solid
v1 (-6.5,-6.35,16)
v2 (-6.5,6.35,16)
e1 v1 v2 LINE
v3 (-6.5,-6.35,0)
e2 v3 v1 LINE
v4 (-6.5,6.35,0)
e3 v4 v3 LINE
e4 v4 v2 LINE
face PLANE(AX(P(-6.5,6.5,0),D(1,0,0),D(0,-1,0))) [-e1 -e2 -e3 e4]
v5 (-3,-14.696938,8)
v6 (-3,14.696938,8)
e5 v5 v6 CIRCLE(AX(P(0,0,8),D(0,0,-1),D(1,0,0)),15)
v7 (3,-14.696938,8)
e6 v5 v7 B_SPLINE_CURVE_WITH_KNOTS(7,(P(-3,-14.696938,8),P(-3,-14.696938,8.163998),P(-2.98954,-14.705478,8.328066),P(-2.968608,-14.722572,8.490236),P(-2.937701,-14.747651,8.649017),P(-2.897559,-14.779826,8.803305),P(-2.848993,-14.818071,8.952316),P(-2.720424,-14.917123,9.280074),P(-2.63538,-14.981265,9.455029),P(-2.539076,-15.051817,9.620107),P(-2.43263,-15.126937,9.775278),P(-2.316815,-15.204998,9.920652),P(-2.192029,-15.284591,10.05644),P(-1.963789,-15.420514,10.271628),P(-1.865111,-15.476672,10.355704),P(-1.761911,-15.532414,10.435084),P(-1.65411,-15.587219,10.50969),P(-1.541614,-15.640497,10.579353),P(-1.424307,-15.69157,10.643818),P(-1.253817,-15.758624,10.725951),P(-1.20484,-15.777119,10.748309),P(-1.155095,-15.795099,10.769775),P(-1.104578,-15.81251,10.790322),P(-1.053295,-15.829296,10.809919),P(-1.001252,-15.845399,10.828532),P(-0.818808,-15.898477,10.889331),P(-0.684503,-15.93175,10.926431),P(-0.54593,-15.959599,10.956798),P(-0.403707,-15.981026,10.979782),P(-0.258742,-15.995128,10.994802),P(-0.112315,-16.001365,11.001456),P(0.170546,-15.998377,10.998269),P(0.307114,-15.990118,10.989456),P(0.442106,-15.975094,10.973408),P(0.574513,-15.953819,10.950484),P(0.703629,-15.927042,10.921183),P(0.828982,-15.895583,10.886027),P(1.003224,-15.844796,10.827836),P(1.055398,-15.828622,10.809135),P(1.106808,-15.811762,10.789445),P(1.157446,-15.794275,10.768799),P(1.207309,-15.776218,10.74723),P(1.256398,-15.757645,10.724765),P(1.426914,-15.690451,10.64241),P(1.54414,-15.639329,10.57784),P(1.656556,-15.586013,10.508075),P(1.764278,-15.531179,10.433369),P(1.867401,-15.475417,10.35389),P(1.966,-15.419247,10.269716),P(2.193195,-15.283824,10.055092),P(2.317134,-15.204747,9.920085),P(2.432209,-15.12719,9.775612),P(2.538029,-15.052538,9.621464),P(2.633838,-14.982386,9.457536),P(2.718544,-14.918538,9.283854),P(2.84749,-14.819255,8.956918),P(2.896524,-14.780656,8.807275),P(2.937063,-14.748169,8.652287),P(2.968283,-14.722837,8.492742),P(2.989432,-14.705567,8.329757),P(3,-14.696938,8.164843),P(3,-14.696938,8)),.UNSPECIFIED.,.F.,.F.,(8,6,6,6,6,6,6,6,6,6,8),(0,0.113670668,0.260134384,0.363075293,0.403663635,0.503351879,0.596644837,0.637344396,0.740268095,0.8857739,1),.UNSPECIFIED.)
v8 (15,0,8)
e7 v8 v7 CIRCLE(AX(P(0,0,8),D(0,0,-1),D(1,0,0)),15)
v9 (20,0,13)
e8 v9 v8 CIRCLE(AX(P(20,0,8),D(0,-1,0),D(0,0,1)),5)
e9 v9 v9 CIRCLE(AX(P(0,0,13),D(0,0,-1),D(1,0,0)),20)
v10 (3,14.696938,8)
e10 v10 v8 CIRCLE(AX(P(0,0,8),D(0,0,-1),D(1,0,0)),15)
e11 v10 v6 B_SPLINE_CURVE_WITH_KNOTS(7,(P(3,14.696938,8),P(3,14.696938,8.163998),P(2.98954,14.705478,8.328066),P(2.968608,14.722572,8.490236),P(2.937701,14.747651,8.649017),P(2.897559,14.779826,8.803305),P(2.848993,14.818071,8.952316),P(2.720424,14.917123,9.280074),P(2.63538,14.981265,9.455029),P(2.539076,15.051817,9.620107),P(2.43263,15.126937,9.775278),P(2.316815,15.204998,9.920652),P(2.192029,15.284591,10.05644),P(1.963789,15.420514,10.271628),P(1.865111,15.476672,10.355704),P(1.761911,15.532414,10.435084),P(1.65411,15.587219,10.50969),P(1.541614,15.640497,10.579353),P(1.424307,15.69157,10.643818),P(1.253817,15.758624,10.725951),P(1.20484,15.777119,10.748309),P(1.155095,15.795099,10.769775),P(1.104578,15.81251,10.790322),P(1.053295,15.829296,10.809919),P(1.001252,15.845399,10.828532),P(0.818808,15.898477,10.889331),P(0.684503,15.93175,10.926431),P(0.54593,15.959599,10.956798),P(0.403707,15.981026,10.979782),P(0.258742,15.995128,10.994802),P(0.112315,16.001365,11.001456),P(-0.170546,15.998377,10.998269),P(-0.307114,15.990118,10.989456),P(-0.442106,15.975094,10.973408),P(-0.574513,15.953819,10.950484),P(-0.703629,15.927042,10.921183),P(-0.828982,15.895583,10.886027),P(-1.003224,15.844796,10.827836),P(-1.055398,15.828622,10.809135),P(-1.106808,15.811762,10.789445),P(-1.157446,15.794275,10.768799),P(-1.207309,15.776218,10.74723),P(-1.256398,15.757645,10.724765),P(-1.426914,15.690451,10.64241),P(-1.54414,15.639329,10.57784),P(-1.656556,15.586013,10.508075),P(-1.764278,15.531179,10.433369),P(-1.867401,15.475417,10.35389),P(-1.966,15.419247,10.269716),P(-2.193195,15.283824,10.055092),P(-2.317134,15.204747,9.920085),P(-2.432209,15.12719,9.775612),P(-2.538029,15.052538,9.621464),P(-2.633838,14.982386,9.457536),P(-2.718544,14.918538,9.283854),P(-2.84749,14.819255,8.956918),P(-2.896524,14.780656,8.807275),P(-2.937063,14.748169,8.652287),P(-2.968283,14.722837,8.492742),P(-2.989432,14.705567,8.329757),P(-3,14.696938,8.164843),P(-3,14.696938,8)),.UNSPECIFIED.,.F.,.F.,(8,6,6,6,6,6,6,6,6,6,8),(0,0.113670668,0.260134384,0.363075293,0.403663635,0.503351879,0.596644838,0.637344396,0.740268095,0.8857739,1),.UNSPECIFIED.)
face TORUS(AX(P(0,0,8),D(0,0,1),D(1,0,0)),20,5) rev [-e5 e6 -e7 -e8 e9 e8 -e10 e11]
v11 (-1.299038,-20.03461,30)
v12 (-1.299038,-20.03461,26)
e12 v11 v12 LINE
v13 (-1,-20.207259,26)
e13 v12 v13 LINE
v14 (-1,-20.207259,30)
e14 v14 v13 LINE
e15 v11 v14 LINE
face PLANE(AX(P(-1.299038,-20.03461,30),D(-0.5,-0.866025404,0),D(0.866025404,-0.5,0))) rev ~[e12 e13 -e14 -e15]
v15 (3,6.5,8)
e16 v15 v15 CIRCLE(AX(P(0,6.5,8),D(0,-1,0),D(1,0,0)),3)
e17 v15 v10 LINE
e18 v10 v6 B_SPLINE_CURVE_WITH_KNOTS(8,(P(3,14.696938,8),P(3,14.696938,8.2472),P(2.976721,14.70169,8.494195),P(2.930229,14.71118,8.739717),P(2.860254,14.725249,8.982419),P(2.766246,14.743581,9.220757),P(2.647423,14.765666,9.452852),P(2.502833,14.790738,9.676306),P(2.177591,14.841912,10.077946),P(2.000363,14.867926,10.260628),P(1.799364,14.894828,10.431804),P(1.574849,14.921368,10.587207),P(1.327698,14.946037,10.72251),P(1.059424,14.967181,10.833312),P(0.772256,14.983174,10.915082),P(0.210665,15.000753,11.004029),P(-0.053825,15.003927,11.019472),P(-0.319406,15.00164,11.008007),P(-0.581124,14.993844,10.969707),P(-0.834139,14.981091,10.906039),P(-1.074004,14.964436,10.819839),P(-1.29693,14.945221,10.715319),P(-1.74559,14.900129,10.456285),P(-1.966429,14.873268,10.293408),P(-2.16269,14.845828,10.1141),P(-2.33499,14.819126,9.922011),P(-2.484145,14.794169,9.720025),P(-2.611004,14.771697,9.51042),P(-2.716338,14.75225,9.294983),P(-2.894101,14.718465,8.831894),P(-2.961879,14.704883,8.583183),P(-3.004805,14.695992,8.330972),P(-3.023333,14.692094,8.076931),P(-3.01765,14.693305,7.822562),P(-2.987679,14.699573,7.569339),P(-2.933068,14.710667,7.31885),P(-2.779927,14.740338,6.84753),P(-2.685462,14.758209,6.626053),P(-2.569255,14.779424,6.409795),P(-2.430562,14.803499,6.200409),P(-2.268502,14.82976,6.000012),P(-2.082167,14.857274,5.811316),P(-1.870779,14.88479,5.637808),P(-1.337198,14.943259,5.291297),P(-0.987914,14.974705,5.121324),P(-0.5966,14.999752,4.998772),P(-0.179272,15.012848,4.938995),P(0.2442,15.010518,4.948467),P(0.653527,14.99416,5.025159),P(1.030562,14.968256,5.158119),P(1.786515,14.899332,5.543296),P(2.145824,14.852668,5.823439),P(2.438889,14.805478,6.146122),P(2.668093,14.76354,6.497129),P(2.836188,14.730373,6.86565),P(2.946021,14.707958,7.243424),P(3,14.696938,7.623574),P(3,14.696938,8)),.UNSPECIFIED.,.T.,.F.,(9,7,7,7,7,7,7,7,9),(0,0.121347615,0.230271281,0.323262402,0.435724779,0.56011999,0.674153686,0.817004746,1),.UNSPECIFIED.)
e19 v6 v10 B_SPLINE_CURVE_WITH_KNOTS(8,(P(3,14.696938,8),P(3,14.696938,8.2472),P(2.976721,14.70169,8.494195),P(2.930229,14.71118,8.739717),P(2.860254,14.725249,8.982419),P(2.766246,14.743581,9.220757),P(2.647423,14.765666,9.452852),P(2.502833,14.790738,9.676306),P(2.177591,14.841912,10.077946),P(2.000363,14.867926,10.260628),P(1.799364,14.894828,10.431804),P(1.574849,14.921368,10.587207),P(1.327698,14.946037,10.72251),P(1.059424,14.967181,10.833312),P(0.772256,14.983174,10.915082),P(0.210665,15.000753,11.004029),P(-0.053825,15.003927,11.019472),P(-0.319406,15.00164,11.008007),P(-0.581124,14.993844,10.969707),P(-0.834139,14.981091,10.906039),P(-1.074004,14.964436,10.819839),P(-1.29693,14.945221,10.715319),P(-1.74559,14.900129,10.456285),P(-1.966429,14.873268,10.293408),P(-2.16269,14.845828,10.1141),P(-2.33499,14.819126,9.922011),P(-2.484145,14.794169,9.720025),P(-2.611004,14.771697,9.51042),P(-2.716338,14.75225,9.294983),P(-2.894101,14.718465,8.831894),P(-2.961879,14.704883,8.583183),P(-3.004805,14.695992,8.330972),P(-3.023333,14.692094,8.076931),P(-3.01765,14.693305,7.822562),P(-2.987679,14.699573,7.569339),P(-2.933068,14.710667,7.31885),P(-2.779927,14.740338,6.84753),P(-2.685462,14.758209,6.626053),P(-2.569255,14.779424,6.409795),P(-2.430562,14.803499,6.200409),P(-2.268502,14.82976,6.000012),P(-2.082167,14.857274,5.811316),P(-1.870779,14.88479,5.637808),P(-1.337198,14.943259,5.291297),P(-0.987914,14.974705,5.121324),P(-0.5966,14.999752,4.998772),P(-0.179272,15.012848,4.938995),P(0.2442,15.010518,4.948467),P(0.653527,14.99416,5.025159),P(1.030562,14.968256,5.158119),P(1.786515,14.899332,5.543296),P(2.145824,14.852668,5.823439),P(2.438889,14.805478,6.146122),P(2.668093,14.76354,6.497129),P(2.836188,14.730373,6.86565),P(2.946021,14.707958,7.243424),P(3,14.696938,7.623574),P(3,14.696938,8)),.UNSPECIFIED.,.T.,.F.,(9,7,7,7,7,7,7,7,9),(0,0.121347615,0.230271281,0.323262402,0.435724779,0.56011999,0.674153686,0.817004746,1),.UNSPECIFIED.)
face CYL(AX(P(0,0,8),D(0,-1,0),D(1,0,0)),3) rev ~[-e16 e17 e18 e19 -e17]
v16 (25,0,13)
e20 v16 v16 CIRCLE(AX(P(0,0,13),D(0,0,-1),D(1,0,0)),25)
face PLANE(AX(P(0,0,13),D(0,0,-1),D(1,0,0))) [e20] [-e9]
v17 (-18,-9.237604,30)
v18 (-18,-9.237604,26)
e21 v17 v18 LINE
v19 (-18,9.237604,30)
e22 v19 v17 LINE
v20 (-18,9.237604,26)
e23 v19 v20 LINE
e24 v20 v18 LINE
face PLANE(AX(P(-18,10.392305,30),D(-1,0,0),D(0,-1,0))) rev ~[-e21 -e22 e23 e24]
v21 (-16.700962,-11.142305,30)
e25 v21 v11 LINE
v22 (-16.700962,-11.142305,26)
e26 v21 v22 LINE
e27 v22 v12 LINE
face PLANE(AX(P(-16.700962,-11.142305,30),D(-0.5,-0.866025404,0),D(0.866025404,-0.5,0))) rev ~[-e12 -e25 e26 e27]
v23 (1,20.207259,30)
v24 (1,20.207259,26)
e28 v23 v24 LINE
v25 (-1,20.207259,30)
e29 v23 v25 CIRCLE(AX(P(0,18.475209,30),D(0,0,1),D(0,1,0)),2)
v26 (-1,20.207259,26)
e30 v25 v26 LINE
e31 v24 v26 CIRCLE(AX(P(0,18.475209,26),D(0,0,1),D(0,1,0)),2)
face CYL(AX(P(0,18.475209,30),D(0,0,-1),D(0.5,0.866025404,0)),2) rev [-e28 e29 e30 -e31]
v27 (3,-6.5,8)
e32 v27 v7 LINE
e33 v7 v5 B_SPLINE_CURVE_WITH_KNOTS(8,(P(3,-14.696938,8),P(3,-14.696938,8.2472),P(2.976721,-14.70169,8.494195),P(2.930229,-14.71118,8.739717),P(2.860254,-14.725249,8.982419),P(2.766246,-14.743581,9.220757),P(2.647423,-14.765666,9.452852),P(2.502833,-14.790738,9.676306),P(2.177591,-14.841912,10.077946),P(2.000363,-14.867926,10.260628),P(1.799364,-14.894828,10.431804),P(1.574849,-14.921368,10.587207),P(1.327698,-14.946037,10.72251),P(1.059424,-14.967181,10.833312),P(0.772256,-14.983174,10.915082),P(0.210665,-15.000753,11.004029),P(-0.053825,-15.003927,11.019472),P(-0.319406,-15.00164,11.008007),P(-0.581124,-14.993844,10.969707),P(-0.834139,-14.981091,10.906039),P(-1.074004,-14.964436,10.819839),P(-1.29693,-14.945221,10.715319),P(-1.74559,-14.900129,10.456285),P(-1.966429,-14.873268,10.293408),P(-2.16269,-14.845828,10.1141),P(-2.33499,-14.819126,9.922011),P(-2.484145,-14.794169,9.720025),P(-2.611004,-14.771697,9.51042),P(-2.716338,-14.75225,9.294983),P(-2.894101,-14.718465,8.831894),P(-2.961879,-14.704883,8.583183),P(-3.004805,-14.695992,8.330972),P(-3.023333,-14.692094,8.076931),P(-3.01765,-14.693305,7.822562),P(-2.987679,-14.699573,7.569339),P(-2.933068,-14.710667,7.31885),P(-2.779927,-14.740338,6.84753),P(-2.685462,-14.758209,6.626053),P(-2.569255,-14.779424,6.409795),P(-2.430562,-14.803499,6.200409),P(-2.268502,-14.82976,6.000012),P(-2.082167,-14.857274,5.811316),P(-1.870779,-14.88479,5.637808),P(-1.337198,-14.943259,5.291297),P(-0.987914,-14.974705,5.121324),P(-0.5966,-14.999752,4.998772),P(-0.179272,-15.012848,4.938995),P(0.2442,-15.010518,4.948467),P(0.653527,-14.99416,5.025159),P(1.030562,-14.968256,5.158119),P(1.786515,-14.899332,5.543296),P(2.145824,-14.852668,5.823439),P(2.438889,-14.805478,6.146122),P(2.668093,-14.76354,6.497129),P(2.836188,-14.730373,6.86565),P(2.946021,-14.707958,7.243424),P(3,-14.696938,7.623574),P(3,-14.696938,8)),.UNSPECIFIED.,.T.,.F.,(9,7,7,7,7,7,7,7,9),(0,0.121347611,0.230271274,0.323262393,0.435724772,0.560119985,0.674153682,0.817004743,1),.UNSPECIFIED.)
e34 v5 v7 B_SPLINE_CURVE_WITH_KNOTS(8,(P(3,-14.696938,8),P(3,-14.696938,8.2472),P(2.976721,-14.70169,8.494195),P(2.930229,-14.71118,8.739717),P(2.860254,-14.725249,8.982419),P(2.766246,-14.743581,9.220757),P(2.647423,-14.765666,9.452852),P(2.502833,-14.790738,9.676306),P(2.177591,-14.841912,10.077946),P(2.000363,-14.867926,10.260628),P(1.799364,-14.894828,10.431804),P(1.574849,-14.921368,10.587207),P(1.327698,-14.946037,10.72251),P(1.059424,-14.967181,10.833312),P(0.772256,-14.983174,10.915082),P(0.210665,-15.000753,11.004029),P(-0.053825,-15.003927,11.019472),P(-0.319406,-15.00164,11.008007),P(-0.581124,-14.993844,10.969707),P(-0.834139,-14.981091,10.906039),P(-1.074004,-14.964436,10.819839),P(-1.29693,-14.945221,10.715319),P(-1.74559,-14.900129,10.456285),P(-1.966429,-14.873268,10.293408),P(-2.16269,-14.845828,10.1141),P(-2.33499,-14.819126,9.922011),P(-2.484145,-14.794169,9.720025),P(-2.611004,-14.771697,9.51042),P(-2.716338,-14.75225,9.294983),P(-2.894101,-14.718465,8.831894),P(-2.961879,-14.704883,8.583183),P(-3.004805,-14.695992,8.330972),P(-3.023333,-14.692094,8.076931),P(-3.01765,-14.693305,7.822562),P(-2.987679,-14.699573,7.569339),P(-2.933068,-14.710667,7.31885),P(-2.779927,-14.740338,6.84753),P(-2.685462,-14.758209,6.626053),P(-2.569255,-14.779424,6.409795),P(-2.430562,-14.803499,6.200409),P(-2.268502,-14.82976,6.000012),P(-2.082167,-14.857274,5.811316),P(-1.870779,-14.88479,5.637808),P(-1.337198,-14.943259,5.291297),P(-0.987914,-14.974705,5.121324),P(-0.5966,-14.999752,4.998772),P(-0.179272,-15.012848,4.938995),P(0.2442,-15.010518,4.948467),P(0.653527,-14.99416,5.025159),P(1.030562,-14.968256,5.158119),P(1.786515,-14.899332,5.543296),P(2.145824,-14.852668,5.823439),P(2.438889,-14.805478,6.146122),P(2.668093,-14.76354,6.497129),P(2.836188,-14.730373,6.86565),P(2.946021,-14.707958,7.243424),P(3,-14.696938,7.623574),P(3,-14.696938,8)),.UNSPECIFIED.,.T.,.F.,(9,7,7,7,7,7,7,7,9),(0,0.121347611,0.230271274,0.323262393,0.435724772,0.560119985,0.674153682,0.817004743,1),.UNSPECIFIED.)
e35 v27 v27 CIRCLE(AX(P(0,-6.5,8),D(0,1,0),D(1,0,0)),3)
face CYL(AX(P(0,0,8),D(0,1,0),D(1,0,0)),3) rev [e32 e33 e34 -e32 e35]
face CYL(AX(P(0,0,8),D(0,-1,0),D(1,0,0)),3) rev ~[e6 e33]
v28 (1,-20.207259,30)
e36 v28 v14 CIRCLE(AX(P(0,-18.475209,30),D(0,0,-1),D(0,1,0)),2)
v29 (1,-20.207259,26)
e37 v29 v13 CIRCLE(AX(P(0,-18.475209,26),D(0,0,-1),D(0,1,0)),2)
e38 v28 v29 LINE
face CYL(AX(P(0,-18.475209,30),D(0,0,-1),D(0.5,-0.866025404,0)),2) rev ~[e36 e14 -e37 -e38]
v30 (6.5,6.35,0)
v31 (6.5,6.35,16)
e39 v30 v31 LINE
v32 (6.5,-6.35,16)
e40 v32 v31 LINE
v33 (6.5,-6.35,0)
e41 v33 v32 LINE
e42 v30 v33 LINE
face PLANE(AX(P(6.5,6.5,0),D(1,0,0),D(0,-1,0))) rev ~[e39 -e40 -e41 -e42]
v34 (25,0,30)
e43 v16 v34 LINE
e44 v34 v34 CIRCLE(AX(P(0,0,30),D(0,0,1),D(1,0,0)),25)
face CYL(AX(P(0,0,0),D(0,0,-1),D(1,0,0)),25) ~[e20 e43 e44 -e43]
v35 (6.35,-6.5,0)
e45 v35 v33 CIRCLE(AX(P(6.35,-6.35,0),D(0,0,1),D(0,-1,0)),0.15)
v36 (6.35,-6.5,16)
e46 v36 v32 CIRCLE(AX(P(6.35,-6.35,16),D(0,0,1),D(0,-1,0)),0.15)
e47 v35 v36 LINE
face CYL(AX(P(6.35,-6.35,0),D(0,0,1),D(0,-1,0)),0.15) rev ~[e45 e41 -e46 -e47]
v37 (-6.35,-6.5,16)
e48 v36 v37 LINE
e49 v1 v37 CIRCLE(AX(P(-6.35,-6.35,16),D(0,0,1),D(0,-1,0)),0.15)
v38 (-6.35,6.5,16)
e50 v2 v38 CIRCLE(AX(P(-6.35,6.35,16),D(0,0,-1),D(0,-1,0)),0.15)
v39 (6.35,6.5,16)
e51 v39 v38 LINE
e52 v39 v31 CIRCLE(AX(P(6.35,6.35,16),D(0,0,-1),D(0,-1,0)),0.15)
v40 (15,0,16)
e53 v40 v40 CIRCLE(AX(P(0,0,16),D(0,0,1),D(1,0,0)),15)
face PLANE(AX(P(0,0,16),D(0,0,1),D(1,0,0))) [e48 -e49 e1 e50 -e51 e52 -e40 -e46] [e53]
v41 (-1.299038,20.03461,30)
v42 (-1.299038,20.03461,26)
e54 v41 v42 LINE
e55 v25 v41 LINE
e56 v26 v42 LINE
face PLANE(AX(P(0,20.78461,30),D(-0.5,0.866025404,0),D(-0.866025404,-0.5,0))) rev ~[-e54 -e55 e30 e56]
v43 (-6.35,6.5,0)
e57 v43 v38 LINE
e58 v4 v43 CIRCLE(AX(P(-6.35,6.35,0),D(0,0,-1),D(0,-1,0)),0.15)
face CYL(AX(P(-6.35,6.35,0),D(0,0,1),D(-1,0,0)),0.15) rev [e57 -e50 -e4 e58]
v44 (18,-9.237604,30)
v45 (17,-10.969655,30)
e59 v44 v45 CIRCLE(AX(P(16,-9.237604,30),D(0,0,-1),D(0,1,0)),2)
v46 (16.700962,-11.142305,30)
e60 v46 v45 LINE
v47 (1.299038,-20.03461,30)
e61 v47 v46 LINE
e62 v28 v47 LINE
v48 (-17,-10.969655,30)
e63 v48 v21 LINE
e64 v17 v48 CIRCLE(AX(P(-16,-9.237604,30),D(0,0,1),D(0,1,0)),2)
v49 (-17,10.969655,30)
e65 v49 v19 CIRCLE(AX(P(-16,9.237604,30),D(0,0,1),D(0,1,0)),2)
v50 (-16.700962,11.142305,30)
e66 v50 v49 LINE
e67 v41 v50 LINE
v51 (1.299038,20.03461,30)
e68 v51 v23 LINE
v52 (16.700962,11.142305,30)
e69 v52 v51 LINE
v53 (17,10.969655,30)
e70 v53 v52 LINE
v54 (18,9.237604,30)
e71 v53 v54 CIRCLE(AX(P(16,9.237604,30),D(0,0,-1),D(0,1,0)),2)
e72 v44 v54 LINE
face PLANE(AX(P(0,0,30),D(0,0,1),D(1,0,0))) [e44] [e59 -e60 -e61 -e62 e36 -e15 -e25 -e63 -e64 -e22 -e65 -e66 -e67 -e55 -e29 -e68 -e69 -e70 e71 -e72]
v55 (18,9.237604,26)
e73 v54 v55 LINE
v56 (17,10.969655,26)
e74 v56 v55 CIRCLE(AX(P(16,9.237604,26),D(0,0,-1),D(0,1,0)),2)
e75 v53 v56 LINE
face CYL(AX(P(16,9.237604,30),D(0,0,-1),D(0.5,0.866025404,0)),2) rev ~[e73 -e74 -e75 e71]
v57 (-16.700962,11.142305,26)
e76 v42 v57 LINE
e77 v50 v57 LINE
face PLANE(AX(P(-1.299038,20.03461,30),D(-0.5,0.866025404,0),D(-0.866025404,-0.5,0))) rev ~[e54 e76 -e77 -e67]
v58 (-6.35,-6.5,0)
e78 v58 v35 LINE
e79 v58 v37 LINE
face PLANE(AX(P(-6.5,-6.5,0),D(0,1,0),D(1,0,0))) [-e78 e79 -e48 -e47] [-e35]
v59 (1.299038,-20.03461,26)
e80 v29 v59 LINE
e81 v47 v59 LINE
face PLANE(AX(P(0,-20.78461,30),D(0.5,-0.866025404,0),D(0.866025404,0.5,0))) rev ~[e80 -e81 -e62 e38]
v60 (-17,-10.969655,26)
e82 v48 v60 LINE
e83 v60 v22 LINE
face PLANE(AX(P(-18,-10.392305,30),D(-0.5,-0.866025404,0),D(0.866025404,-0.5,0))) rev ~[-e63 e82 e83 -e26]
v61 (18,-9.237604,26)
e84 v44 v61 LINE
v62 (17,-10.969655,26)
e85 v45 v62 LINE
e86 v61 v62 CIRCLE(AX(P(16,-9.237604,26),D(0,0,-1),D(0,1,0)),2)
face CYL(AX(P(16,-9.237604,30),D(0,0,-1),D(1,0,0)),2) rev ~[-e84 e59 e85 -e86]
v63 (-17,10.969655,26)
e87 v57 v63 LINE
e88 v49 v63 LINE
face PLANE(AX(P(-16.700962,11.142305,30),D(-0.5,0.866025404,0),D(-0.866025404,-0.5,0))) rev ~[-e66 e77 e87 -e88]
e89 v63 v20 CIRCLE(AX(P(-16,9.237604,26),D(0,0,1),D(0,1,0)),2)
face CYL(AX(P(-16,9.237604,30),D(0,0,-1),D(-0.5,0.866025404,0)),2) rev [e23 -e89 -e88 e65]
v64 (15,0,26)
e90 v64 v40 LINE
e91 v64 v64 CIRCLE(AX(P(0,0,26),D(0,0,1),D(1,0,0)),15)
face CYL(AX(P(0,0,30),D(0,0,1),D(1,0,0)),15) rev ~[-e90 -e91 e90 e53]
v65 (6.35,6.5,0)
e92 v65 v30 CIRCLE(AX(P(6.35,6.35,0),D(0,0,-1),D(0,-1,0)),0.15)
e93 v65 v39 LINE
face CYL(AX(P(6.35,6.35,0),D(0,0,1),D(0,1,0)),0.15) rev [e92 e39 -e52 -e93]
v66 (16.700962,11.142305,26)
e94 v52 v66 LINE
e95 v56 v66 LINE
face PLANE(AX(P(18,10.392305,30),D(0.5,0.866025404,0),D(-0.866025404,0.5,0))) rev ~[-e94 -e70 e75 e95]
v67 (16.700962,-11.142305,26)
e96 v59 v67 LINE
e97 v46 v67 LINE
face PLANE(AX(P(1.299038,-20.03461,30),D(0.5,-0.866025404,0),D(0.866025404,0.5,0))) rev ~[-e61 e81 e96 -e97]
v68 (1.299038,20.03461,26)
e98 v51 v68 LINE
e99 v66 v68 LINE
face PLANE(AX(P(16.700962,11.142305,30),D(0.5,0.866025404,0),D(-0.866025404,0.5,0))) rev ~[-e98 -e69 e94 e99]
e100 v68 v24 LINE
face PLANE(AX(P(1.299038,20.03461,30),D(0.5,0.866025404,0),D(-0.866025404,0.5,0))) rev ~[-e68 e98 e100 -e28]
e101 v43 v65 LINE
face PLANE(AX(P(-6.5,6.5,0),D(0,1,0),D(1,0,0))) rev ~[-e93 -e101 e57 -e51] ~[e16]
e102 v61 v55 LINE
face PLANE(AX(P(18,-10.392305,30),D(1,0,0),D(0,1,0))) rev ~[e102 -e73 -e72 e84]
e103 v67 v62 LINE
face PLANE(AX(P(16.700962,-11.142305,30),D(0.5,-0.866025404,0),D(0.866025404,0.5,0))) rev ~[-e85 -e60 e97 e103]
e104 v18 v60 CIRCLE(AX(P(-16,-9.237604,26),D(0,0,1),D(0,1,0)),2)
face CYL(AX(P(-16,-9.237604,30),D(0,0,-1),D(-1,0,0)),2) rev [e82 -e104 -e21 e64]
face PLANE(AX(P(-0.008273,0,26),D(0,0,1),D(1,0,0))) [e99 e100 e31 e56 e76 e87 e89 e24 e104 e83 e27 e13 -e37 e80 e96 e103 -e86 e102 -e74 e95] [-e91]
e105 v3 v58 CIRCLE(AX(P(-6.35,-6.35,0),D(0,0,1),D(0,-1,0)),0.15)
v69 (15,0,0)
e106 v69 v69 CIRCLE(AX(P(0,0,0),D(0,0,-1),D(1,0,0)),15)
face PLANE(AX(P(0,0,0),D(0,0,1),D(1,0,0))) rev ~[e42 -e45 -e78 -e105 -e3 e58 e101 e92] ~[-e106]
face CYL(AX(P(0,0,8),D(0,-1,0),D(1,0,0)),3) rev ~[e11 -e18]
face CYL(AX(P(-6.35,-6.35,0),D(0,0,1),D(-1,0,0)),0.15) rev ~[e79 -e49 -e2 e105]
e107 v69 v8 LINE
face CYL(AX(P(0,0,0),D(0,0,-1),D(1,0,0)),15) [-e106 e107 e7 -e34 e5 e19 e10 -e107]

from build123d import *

# Parameters (mm, degrees)
F0_R           = 25
F1_DEPTH       = 30
F3_DEPTH       = 4
F4_R           = 15
F5_DEPTH       = 14
F6_W           = 13
F6_H           = 13
F7_DEPTH       = 30.001
F8_R           = 25
F8_R_2         = 15
F9_DEPTH       = 13
F10_R          = 3
F11_DEPTH      = 25.001
F11_DEPTH_BACK = 25.001
F12_S5_R       = 3
F12_T6_DEPTH   = 32
F13_R          = 0.15
F14_R          = 2


# Not quite as in the source:
# - a fillet or chamfer that OpenCascade refuses, or shapes differently, is made with other operations: its cross-section is extruded or revolved along the edge and cut away or added


with BuildPart() as f1:
    # F0 (on Top) → F1 (new body)
    with BuildSketch(Plane.XY):
        Circle(F0_R)
    extrude(amount=F1_DEPTH)

    # F2 (on face) → F3 (cut)
    with BuildSketch(Plane.XY.offset(30)):
        with BuildLine():
            Line((16.7009618943, 11.1423048454), (1.2990381057, 20.0346096908))
            ThreePointArc((1.2990381057, 20.0346096908), (0, 19.2846096908), (-1.2990381057, 20.0346096908))
            Line((-1.2990381057, 20.0346096908), (-16.7009618943, 11.1423048454))
            ThreePointArc((-16.7009618943, 11.1423048454), (-16.5511112606, 10.7805334131), (-16.5, 10.3923048454))
            ThreePointArc((-16.5, 10.3923048454), (-16.9393398282, 9.3316446736), (-18, 8.8923048454))
            Line((-18, 8.8923048454), (-18, -8.8923048454))
            ThreePointArc((-18, -8.8923048454), (-16.9393398282, -9.3316446736), (-16.5, -10.3923048454))
            ThreePointArc((-16.5, -10.3923048454), (-16.5511112606, -10.7805334131), (-16.7009618943, -11.1423048454))
            Line((-16.7009618943, -11.1423048454), (-1.2990381057, -20.0346096908))
            ThreePointArc((-1.2990381057, -20.0346096908), (0, -19.2846096908), (1.2990381057, -20.0346096908))
            Line((1.2990381057, -20.0346096908), (16.7009618943, -11.1423048454))
            ThreePointArc((16.7009618943, -11.1423048454), (16.7009618943, -9.6423048454), (18, -8.8923048454))
            Line((18, -8.8923048454), (18, 8.8923048454))
            ThreePointArc((18, 8.8923048454), (16.7009618943, 9.6423048454), (16.7009618943, 11.1423048454))
        make_face()
        with BuildLine():
            ThreePointArc((-16.5, 10.3923048454), (-16.5511112606, 10.7805334131), (-16.7009618943, 11.1423048454))
            Line((-16.7009618943, 11.1423048454), (-18, 10.3923048454))
            Line((-18, 10.3923048454), (-18, 8.8923048454))
            ThreePointArc((-18, 8.8923048454), (-16.9393398282, 9.3316446736), (-16.5, 10.3923048454))
        make_face()
        with BuildLine():
            ThreePointArc((-16.5, -10.3923048454), (-16.9393398282, -9.3316446736), (-18, -8.8923048454))
            Line((-18, -8.8923048454), (-18, -10.3923048454))
            Line((-18, -10.3923048454), (-16.7009618943, -11.1423048454))
            ThreePointArc((-16.7009618943, -11.1423048454), (-16.5511112606, -10.7805334131), (-16.5, -10.3923048454))
        make_face()
        with BuildLine():
            Line((0, -20.7846096908), (1.2990381057, -20.0346096908))
            ThreePointArc((1.2990381057, -20.0346096908), (0, -19.2846096908), (-1.2990381057, -20.0346096908))
            Line((-1.2990381057, -20.0346096908), (0, -20.7846096908))
        make_face()
        with BuildLine():
            Line((18, -10.3923048454), (18, -8.8923048454))
            ThreePointArc((18, -8.8923048454), (16.7009618943, -9.6423048454), (16.7009618943, -11.1423048454))
            Line((16.7009618943, -11.1423048454), (18, -10.3923048454))
        make_face()
        with BuildLine():
            Line((18, 10.3923048454), (16.7009618943, 11.1423048454))
            ThreePointArc((16.7009618943, 11.1423048454), (16.7009618943, 9.6423048454), (18, 8.8923048454))
            Line((18, 8.8923048454), (18, 10.3923048454))
        make_face()
        with BuildLine():
            Line((1.2990381057, 20.0346096908), (0, 20.7846096908))
            Line((0, 20.7846096908), (-1.2990381057, 20.0346096908))
            ThreePointArc((-1.2990381057, 20.0346096908), (0, 19.2846096908), (1.2990381057, 20.0346096908))
        make_face()
    extrude(amount=-F3_DEPTH, mode=Mode.SUBTRACT)

    # F4 (on face) → F5 (cut)
    with BuildSketch(Plane.XY.offset(30)):
        Circle(F4_R)
    extrude(amount=-F5_DEPTH, mode=Mode.SUBTRACT)

    # F6 (on face) → F7 (cut, through all)
    with BuildSketch(Plane(origin=(0, 0, 0), x_dir=(1, 0, 0), z_dir=(0, 0, -1))):
        Rectangle(F6_W, F6_H)
    extrude(amount=-F7_DEPTH, mode=Mode.SUBTRACT)

    # F8 (on face) → F9 (cut)
    with BuildSketch(Plane(origin=(0, 0, 0), x_dir=(1, 0, 0), z_dir=(0, 0, -1))):
        Circle(F8_R)
        Circle(F8_R_2, mode=Mode.SUBTRACT)
    extrude(amount=-F9_DEPTH, mode=Mode.SUBTRACT)

    # F10 (on Front) → F11 (cut, two sides)
    with BuildSketch(Plane.XZ) as f11_sk:
        with Locations((0, 8)):
            Circle(F10_R)
    extrude(amount=-F11_DEPTH, mode=Mode.SUBTRACT)
    extrude(f11_sk.sketch, amount=F11_DEPTH_BACK, mode=Mode.SUBTRACT)

    # F12: fillet of radius 5 on 1 edges, made by hand


with BuildPart() as f12_tool2:
    # F12_s3 → F12_t4 (revolve)
    with BuildSketch(Plane.XZ):
        with BuildLine():
            ThreePointArc((20, 13), (16.4644660941, 11.5355339059), (15, 8))
            Line((15, 8), (15, 13))
            Line((15, 13), (20, 13))
        make_face()
    revolve(axis=Axis((0, 0, 13), (0, 0, -1)))

    # F12_s5 → F12_t6 (cut, symmetric)
    with BuildSketch(Plane.XZ):
        with Locations((0, 8)):
            Circle(F12_S5_R)
    extrude(amount=F12_T6_DEPTH, both=True, mode=Mode.SUBTRACT)


with BuildPart() as f1_1:
    add(f1.part)

    # F12_t1: union F12_tool2
    add(f12_tool2.part)

    # F13
    f13_edges = [f1_1.edges().sort_by_distance(p)[0] for p in [
        (-6.5, -6.5, 8),
        (-6.5, 6.5, 8),
        (6.5, 6.5, 8),
        (6.5, -6.5, 8),
    ]]
    fillet(f13_edges, radius=F13_R)

    # F14
    f14_edges = [f1_1.edges().sort_by_distance(p)[0] for p in [
        (-18, -10.392305, 28),
        (-18, 10.392305, 28),
        (0, -20.78461, 28),
        (18, -10.392305, 28),
        (18, 10.392305, 28),
        (0, 20.78461, 28),
    ]]
    fillet(f14_edges, radius=F14_R)


solid = f1_1.part
